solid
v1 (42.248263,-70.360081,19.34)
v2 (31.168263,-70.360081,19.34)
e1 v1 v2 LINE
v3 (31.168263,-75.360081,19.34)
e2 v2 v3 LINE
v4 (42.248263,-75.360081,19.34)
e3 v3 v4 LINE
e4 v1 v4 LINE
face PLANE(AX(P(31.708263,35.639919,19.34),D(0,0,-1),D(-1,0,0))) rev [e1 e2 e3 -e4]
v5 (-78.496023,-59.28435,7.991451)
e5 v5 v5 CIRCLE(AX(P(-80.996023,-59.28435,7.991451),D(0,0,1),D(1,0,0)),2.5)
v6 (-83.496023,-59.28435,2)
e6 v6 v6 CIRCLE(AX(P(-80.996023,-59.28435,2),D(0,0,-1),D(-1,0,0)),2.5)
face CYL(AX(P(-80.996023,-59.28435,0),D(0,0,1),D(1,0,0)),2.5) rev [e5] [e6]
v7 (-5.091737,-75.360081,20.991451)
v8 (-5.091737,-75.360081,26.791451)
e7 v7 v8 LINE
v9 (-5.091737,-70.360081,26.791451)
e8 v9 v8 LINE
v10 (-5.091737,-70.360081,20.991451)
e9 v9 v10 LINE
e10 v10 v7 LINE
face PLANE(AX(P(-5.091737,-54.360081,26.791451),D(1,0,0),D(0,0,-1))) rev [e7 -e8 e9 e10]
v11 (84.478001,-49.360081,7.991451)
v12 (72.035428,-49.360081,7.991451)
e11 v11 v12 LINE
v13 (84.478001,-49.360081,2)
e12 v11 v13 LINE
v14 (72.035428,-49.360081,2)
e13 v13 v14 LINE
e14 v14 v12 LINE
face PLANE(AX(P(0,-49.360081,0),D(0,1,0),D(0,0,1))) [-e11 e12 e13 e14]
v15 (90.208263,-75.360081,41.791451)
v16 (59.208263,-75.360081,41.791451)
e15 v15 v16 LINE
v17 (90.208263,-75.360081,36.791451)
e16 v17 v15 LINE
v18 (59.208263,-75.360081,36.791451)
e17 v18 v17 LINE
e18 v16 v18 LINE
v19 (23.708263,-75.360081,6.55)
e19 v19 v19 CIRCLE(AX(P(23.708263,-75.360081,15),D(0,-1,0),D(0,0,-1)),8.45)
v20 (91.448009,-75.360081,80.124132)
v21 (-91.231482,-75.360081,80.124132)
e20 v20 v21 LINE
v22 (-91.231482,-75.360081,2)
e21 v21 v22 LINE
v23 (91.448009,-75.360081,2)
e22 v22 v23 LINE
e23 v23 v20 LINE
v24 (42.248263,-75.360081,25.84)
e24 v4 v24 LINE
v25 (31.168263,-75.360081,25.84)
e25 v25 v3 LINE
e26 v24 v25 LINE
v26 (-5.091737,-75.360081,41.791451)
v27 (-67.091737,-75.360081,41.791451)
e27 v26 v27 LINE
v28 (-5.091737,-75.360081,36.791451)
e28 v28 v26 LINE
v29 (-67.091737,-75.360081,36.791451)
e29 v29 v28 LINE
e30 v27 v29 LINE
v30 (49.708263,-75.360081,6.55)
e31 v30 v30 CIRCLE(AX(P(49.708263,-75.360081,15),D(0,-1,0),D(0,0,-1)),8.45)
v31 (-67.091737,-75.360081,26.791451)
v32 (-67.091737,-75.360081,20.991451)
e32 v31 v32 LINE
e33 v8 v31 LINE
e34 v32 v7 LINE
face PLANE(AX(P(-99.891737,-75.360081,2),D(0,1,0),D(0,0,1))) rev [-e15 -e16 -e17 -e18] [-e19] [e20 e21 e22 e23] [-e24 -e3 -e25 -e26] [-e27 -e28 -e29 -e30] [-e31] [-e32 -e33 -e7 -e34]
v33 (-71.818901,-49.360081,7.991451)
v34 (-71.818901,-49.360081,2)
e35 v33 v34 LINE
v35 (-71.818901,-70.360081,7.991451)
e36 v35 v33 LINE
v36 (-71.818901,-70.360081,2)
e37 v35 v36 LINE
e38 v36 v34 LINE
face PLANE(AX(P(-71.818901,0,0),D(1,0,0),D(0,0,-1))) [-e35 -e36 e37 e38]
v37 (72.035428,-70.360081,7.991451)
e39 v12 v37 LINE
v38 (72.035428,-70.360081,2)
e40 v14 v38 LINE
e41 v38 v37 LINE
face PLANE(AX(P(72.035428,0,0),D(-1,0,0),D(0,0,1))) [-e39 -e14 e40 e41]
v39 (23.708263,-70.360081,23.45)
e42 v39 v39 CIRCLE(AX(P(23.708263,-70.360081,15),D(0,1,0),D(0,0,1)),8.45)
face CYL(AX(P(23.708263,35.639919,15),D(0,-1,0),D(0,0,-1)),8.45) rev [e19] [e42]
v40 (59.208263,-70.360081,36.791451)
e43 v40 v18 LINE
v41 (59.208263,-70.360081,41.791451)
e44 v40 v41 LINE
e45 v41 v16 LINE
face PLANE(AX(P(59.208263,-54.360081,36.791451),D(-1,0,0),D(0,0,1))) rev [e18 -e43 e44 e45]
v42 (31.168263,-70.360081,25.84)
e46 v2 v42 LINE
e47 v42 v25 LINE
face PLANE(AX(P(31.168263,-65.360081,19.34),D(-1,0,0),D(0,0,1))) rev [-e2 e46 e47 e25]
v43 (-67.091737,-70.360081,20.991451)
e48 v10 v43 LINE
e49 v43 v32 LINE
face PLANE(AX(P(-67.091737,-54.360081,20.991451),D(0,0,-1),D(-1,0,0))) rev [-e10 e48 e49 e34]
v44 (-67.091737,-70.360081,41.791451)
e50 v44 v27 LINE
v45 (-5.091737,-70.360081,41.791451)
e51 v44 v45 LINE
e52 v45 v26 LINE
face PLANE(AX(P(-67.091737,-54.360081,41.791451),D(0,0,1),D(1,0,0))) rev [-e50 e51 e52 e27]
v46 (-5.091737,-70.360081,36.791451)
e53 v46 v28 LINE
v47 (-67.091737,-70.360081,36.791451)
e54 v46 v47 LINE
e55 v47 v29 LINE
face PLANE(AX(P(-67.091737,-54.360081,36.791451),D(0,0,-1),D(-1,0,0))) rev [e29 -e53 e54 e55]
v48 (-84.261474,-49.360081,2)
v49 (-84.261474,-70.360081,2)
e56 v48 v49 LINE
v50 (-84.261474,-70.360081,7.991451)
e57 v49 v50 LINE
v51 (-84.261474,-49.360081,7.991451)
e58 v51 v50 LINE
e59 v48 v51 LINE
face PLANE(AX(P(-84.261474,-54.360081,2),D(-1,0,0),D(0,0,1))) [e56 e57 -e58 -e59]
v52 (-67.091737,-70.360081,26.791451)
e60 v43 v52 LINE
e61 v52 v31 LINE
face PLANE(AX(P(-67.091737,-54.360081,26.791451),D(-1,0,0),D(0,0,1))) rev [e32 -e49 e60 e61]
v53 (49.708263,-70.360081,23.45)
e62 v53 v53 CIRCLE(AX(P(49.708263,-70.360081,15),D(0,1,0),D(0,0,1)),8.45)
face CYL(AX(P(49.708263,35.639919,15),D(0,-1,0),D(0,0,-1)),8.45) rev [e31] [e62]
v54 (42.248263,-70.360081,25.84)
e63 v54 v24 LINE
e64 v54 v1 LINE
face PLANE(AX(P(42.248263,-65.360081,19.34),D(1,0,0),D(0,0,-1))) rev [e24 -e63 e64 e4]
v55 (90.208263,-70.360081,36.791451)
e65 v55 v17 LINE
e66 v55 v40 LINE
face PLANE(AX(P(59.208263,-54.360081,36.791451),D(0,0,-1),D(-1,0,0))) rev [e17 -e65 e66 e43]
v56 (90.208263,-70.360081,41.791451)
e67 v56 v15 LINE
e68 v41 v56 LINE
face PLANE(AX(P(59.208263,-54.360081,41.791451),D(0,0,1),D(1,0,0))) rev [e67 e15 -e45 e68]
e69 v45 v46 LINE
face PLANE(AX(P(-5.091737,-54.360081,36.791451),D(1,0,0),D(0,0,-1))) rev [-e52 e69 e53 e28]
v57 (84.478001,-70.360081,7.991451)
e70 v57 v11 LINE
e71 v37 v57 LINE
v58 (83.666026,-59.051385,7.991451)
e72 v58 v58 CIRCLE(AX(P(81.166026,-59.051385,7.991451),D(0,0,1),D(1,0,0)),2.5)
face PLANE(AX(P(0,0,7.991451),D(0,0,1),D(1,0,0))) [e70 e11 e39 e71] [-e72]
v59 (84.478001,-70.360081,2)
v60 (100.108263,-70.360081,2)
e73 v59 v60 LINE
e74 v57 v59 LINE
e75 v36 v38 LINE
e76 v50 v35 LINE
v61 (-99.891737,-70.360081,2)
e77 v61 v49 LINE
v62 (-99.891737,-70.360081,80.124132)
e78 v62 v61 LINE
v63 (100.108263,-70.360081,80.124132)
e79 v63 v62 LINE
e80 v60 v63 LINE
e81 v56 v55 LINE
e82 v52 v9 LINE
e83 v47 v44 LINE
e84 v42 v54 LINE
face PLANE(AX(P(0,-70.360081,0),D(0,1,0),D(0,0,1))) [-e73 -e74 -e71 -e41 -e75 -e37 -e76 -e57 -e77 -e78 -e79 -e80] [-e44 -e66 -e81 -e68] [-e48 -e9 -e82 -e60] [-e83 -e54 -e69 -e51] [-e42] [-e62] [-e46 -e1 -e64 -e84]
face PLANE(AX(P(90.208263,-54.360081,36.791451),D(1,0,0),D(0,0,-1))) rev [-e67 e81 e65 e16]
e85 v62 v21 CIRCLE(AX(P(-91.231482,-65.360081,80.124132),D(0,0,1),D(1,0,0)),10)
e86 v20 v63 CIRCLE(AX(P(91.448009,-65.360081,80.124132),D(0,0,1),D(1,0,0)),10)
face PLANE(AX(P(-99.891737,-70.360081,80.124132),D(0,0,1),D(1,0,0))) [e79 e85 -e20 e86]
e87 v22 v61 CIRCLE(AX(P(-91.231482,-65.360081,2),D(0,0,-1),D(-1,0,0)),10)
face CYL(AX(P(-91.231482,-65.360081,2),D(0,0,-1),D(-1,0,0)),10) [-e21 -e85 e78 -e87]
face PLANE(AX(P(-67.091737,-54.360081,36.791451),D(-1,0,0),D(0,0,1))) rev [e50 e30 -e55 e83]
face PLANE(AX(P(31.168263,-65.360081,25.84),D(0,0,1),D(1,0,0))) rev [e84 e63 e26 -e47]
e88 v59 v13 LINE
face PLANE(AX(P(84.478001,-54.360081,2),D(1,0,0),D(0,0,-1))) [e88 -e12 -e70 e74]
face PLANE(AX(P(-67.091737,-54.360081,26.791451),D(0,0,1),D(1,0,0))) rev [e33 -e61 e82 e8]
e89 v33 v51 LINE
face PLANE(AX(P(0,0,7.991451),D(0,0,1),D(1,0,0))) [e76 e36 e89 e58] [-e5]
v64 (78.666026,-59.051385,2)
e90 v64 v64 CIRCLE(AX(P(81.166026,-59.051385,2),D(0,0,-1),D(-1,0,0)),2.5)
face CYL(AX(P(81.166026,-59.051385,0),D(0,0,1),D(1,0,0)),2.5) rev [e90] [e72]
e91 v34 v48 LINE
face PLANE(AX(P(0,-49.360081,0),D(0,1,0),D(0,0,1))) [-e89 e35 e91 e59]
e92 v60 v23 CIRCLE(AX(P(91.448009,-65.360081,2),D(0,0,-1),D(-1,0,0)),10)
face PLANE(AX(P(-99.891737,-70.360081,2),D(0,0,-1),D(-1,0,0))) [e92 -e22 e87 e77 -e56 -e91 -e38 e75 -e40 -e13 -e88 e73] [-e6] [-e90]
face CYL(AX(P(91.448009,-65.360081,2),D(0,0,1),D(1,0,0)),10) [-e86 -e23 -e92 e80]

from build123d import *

# Parameters (mm, degrees)
CROQUIS2_W              = 200
CROQUIS2_H              = 150
CROQUIS2_R              = 2
CROQUIS2_R_2            = 2.5
CROQUIS2_W_2            = 31.297292299
CROQUIS2_H_2            = 43.768728426
CROQUIS2_H_3            = 43.768728427
CROQUIS2_W_3            = 23.573907934
CROQUIS2_H_4            = 45.323962431
SALIENTE_EXTRUIR1_DEPTH = 2
REDONDEO1_R             = 10
BOSS_EXTRUDE1_DEPTH     = 25
SKETCH3_W               = 62.040442094
SKETCH3_H               = 5.530821024
BOSS_EXTRUDE2_DEPTH     = 22
SKETCH8_W               = 62.040442094
SKETCH8_H               = 5.530821024
BOSS_EXTRUDE6_DEPTH     = 13
SKETCH2_W               = 200
SKETCH2_H               = 78.124132015
SKETCH2_W_2             = 62.040442094
SKETCH2_H_2             = 5.530821024
BOSS_EXTRUDE3_DEPTH     = 5
SKETCH4_W               = 62.040442094
SKETCH4_H               = 5.530821024
BOSS_EXTRUDE4_DEPTH     = 19
SKETCH5_W               = 7.442573222
SKETCH5_H               = 2.991451355
BOSS_EXTRUDE5_DEPTH     = 21
SKETCH6_R               = 2.5
CUT_EXTRUDE1_DEPTH      = 151.539762497
FILLET1_R               = 10
CUT_EXTRUDE2_DEPTH      = 153.054859813
CUT_EXTRUDE2_DEPTH_BACK = 13
SKETCH9_R               = 2.463920505
SKETCH9_R_2             = 2.5
SKETCH9_W               = 62.040442094
SKETCH9_H               = 4.214652984
CUT_EXTRUDE3_DEPTH      = 26
CUT_EXTRUDE3_DEPTH_BACK = 215.68865463
SKETCH10_W              = 2
SKETCH10_H              = 21
SKETCH11_W              = 62
SKETCH11_H              = 5.8
SKETCH11_H_2            = 5
SKETCH11_W_2            = 31
CUT_EXTRUDE4_DEPTH      = 130.932832439
CROQUIS4_W              = 2.991451355
CROQUIS4_H              = 16
SALIENTE_EXTRUIR2_DEPTH = 5
CROQUIS5_W              = 12.442573222
CROQUIS5_H              = 2.991451355
SALIENTE_EXTRUIR3_DEPTH = 5
CROQUIS7_W              = 12.442573222
CROQUIS7_H              = 21
SALIENTE_EXTRUIR4_DEPTH = 3
CORTAR_EXTRUIR3_START   = -15
CROQUIS8_R              = 2.5
CORTAR_EXTRUIR3_DEPTH   = 15
CROQUIS9_W              = 2.991451355
CROQUIS9_H              = 16
SALIENTE_EXTRUIR5_DEPTH = 5
CROQUIS10_W             = 12.442573222
CROQUIS10_H             = 2.991451355
SALIENTE_EXTRUIR6_DEPTH = 5
CROQUIS11_W             = 12.442573222
CROQUIS11_H             = 21
SALIENTE_EXTRUIR7_DEPTH = 3
CORTAR_EXTRUIR4_START   = -11
CROQUIS12_R             = 2.5
CORTAR_EXTRUIR4_DEPTH   = 11
CROQUIS15_R             = 8.45
CROQUIS15_W             = 10
CROQUIS15_H             = 5
CORTAR_EXTRUIR8_DEPTH   = 111
CORTAR_EXTRUIR10_DEPTH  = 10


with BuildPart() as part:
    # Croquis2 → Saliente-Extruir1 (new body)
    with BuildSketch(Plane.XY):
        with Locations((0.108263467, -0.36008145)):
            Rectangle(CROQUIS2_W, CROQUIS2_H)
        with Locations((89.108263467, -66.5)):
            Circle(CROQUIS2_R, mode=Mode.SUBTRACT)
        with Locations((-88.891736533, -66.5)):
            Circle(CROQUIS2_R, mode=Mode.SUBTRACT)
        with Locations(Location((89.108263467, 65.779837101, 0), (0, 0, 180))):
            Circle(CROQUIS2_R, mode=Mode.SUBTRACT)
        with Locations(Location((-88.891736533, 65.779837101, 0), (0, 0, 180))):
            Circle(CROQUIS2_R, mode=Mode.SUBTRACT)
        with Locations((-80.865436179, -59.36008145)):
            Circle(CROQUIS2_R_2, mode=Mode.SUBTRACT)
        with Locations((81.108263467, -59.36008145)):
            Circle(CROQUIS2_R_2, mode=Mode.SUBTRACT)
        with Locations(Location((81.108263467, 58.63991855, 0), (0, 0, 180))):
            Circle(CROQUIS2_R_2, mode=Mode.SUBTRACT)
        with Locations(Location((-80.865436179, 58.63991855, 0), (0, 0, 180))):
            Circle(CROQUIS2_R_2, mode=Mode.SUBTRACT)
        with BuildLine():
            Line((-62.091736533, 70.63991855), (64.108263467, 70.63991855))
            ThreePointArc((64.108263467, 70.63991855), (66.108263467, 68.63991855), (64.108263467, 66.63991855))
            Line((64.108263467, 66.63991855), (-62.091736533, 66.63991855))
            ThreePointArc((-62.091736533, 66.63991855), (-64.091736533, 68.63991855), (-62.091736533, 70.63991855))
        make_face(mode=Mode.SUBTRACT)
        Polygon((-71.391736533, -12.902447307), (-71.391736533, 12.182284408), (-79.241736533, 12.28991855), (-83.891736533, 12.28991855), (-83.891736533, -13.01008145), (-79.241736533, -13.01008145), align=None, mode=Mode.SUBTRACT)
        with BuildLine():
            Line((92.108263467, 45.478381757), (92.108263467, -46.198544657))
            ThreePointArc((92.108263467, -46.198544657), (90.807295546, -47.897576736), (89.108263467, -46.596608814))
            Line((89.108263467, -46.596608814), (89.108263467, 45.876445915))
            ThreePointArc((89.108263467, 45.876445915), (90.807295546, 47.177413836), (92.108263467, 45.478381757))
        make_face(mode=Mode.SUBTRACT)
        Polygon((84.108263467, 12.28991855), (84.108263467, -13.01008145), (79.458263467, -13.01008145), (71.608263467, -13.01008145), (71.608263467, 12.28991855), (79.458263467, 12.28991855), align=None, mode=Mode.SUBTRACT)
        with BuildLine():
            Line((-91.891736533, 45.478381757), (-91.891736533, -46.198544657))
            ThreePointArc((-91.891736533, -46.198544657), (-90.590768612, -47.897576736), (-88.891736533, -46.596608814))
            Line((-88.891736533, -46.596608814), (-88.891736533, 45.876445915))
            ThreePointArc((-88.891736533, 45.876445915), (-90.590768612, 47.177413836), (-91.891736533, 45.478381757))
        make_face(mode=Mode.SUBTRACT)
        with Locations((-30.011405388, 36.299005811)):
            Rectangle(CROQUIS2_W_2, CROQUIS2_H_2, mode=Mode.SUBTRACT)
        with BuildLine():
            Line((-62.091736533, -71.36008145), (64.108263467, -71.36008145))
            ThreePointArc((64.108263467, -71.36008145), (66.108263467, -69.36008145), (64.108263467, -67.36008145))
            Line((64.108263467, -67.36008145), (-62.091736533, -67.36008145))
            ThreePointArc((-62.091736533, -67.36008145), (-64.091736533, -69.36008145), (-62.091736533, -71.36008145))
        make_face(mode=Mode.SUBTRACT)
        with Locations((-30.011405388, -26.799059535)):
            Rectangle(CROQUIS2_W_2, CROQUIS2_H_3, mode=Mode.SUBTRACT)
        with Locations((12.982877294, -0.693345879)):
            Rectangle(CROQUIS2_W_3, CROQUIS2_H_4, mode=Mode.SUBTRACT)
    extrude(amount=SALIENTE_EXTRUIR1_DEPTH)

    # Redondeo1
    redondeo1_edges = [part.edges().sort_by_distance(p)[0] for p in [
        (100.108263467, -75.36008145, 1),
        (-99.891736533, -75.36008145, 1),
        (-99.891736533, 74.63991855, 1),
        (100.108263467, 74.63991855, 1),
    ]]
    fillet(redondeo1_edges, radius=REDONDEO1_R)

    # Sketch1 → Boss-Extrude1 (add)
    with BuildSketch(Plane.XY.offset(2)):
        Polygon((-67.071845217, 64.63991855), (-67.071845217, 60.63991855), (-8.841198185, 60.63991855), (-8.841198185, 3.63991855), (-67.071845217, 3.63991855), (-67.071845217, -0.36008145), (-8.841198185, -0.36008145), (-8.841198185, -53.36008145), (-67.071845217, -53.36008145), (-67.071845217, -57.574734434), (-5.031403123, -57.574734434), (-5.031403123, -40.931443482), (46.608263467, -40.931443482), (46.608263467, -36.931443482), (-5.031403123, -36.931443482), (-5.031403123, 30.068556518), (46.608263467, 30.068556518), (46.608263467, 34.068556518), (-5.031403123, 34.068556518), (-5.031403123, 64.63991855), align=None)
    extrude(amount=BOSS_EXTRUDE1_DEPTH)

    # Sketch3 → Boss-Extrude2 (add)
    with BuildSketch(Plane.XZ.offset(57.574734434)):
        with Locations((-36.05162417, 24.234589488)):
            Rectangle(SKETCH3_W, SKETCH3_H)
    extrude(amount=BOSS_EXTRUDE2_DEPTH)

    # Sketch8 → Boss-Extrude6 (add)
    with BuildSketch(Plane(origin=(0, 64.63991855, 0), x_dir=(1, 0, 0), z_dir=(0, 1, 0))):
        with Locations((-36.05162417, -24.234589488)):
            Rectangle(SKETCH8_W, SKETCH8_H)
    extrude(amount=BOSS_EXTRUDE6_DEPTH)

    # Sketch2 → Boss-Extrude3 (add)
    with BuildSketch(Plane.XZ.offset(75.36008145)):
        with Locations((0.108263467, 41.062066008)):
            Rectangle(SKETCH2_W, SKETCH2_H)
        with Locations((-36.05162417, 24.234589488)):
            Rectangle(SKETCH2_W_2, SKETCH2_H_2, mode=Mode.SUBTRACT)
    extrude(amount=-BOSS_EXTRUDE3_DEPTH)

    # Sketch4 → Boss-Extrude4 (add)
    with BuildSketch(Plane(origin=(0, 64.63991855, 0), x_dir=(1, 0, 0), z_dir=(0, 1, 0))):
        with Locations((-36.05162417, -24.234589488)):
            Rectangle(SKETCH4_W, SKETCH4_H)
    extrude(amount=BOSS_EXTRUDE4_DEPTH)

    # Sketch5 → Boss-Extrude5 (add)
    with BuildSketch(Plane.XZ.offset(75.36008145)):
        with Locations((-80.540187187, 3.495725678)):
            Rectangle(SKETCH5_W, SKETCH5_H)
        with Locations((80.756714122, 3.495725678)):
            Rectangle(SKETCH5_W, SKETCH5_H)
    extrude(amount=-BOSS_EXTRUDE5_DEPTH)

    # Sketch6 → Cut-Extrude1 (cut, through all)
    with BuildSketch(Plane.XY.offset(4.991451355)):
        with Locations((-80.996023003, -59.284349751)):
            Circle(SKETCH6_R)
        with Locations(Location((81.166025964, -59.051385225, 0), (0, 0, 345.800348631))):
            Circle(SKETCH6_R)
    extrude(amount=-CUT_EXTRUDE1_DEPTH, mode=Mode.SUBTRACT)

    # Fillet1
    # the kernel refuses this fillet: 10 mm, written as the material it takes off along each edge
    with BuildSketch(Plane(origin=(-99.891736533, -75.36008145, 101.77476711), x_dir=(1, 0, 0), z_dir=(0, 0, -1)), Plane(origin=(100.108263467, -75.36008145, -19.650635095), x_dir=(-1, 0, 0), z_dir=(0, 0, 1))) as fillet1_piece_1:
        with BuildLine():
            CenterArc((8.660254038, -10), FILLET1_R, 90, 60)
            Line((0, -5), (-0.173205081, -4.9))
            ThreePointArc((-0.173205081, -4.9), (-0.2, -2.5), (-0.2, 0))
            Line((-0.2, 0), (0, 0.2))
            Line((0, 0.2), (8.660254038, 0.2))
            Line((8.660254038, 0.2), (8.660254038, 0))
        make_face()
    extrude(amount=121.425402204, mode=Mode.SUBTRACT)

    # Sketch9 → Cut-Extrude2 (cut, two sides: drawn at the far end of the back side and taken through both)
    with BuildSketch(Plane.XY.offset(2).offset(-CUT_EXTRUDE2_DEPTH_BACK)):
        with Locations((-80.996023003, -59.284349751)):
            Circle(SKETCH9_R)
        with Locations(Location((81.166025964, -59.051385225, 0), (0, 0, 345.800348631))):
            Circle(SKETCH9_R_2)
        Polygon((-84.261473798, -70.36008145), (-84.261473798, -54.36008145), (-76.818900576, -54.36008145), (-76.818900576, -70.36008145), (77.035427511, -70.36008145), (77.035427511, -54.36008145), (84.478000733, -54.36008145), (84.478000733, -70.36008145), (100.108263467, -70.36008145), (100.108263467, 85.68147533), (-108.295057911, 85.68147533), (-108.295057911, -70.36008145), align=None)
        with Locations((-36.05162417, -77.467407942)):
            Rectangle(SKETCH9_W, SKETCH9_H)
    extrude(amount=CUT_EXTRUDE2_DEPTH + CUT_EXTRUDE2_DEPTH_BACK, mode=Mode.SUBTRACT)

    # Sketch10 → Cut-Extrude3 (cut, two sides: drawn at the far end of the back side and taken through both)
    with BuildSketch(Plane.ZY.offset(84.261473798).offset(-CUT_EXTRUDE3_DEPTH_BACK)):
        with Locations((1, -64.86008145)):
            Rectangle(SKETCH10_W, SKETCH10_H)
    extrude(amount=CUT_EXTRUDE3_DEPTH + CUT_EXTRUDE3_DEPTH_BACK, mode=Mode.SUBTRACT)

    # Sketch11 → Cut-Extrude4 (cut, through all)
    with BuildSketch(Plane.XZ.offset(75.36008145)):
        with Locations((-36.091736533, 23.891451355)):
            Rectangle(SKETCH11_W, SKETCH11_H)
        with Locations((-36.091736533, 39.291451355)):
            Rectangle(SKETCH11_W, SKETCH11_H_2)
        with Locations((74.708263467, 39.291451355)):
            Rectangle(SKETCH11_W_2, SKETCH11_H_2)
    extrude(amount=-CUT_EXTRUDE4_DEPTH, mode=Mode.SUBTRACT)

    # Croquis4 → Saliente-Extruir2 (add)
    with BuildSketch(Plane.ZY.offset(-77.035427511)):
        with Locations((3.495725678, -62.36008145)):
            Rectangle(CROQUIS4_W, CROQUIS4_H)
    extrude(amount=SALIENTE_EXTRUIR2_DEPTH)

    # Croquis5 → Saliente-Extruir3 (add)
    with BuildSketch(Plane(origin=(0, -54.36008145, 0), x_dir=(1, 0, 0), z_dir=(0, 1, 0))):
        with Locations((78.256714122, -3.495725678)):
            Rectangle(CROQUIS5_W, CROQUIS5_H)
    extrude(amount=SALIENTE_EXTRUIR3_DEPTH)

    # Croquis7 → Saliente-Extruir4 (add)
    with BuildSketch(Plane.XY.offset(4.991451355)):
        with Locations((78.256714122, -59.86008145)):
            Rectangle(CROQUIS7_W, CROQUIS7_H)
    extrude(amount=SALIENTE_EXTRUIR4_DEPTH)

    # Croquis8 → Cortar-Extruir3 (cut)
    with BuildSketch(Plane(origin=(0, 0, 2), x_dir=(-1, 0, 0), z_dir=(0, 0, -1)).offset(CORTAR_EXTRUIR3_START)):
        with Locations(Location((-81.166025964, -59.051385225, 0), (0, 0, 180))):
            Circle(CROQUIS8_R)
    extrude(amount=CORTAR_EXTRUIR3_DEPTH, mode=Mode.SUBTRACT)

    # Croquis9 → Saliente-Extruir5 (add)
    with BuildSketch(Plane(origin=(-76.818900576, 0, 0), x_dir=(0, 0, -1), z_dir=(1, 0, 0))):
        with Locations((-3.495725678, -62.36008145)):
            Rectangle(CROQUIS9_W, CROQUIS9_H)
    extrude(amount=SALIENTE_EXTRUIR5_DEPTH)

    # Croquis10 → Saliente-Extruir6 (add)
    with BuildSketch(Plane(origin=(0, -54.36008145, 0), x_dir=(1, 0, 0), z_dir=(0, 1, 0))):
        with Locations((-78.040187187, -3.495725678)):
            Rectangle(CROQUIS10_W, CROQUIS10_H)
    extrude(amount=SALIENTE_EXTRUIR6_DEPTH)

    # Croquis11 → Saliente-Extruir7 (add)
    with BuildSketch(Plane.XY.offset(4.991451355)):
        with Locations((-78.040187187, -59.86008145)):
            Rectangle(CROQUIS11_W, CROQUIS11_H)
    extrude(amount=SALIENTE_EXTRUIR7_DEPTH)

    # Croquis12 → Cortar-Extruir4 (cut)
    with BuildSketch(Plane(origin=(0, 0, 2), x_dir=(-1, 0, 0), z_dir=(0, 0, -1)).offset(CORTAR_EXTRUIR4_START)):
        with Locations(Location((80.996023003, -59.284349751, 0), (0, 0, 180))):
            Circle(CROQUIS12_R)
    extrude(amount=CORTAR_EXTRUIR4_DEPTH, mode=Mode.SUBTRACT)

    # Croquis15 → Cortar-Extruir8 (cut)
    with BuildSketch(Plane.XZ.offset(75.36008145)):
        with Locations(Location((23.708263467, 15, 0), (0, 0, 270))):
            Circle(CROQUIS15_R)
        with Locations(Location((49.708263467, 15, 0), (0, 0, 270))):
            Circle(CROQUIS15_R)
        with Locations((36.708263467, 21.84)):
            Rectangle(CROQUIS15_W, CROQUIS15_H)
    extrude(amount=-CORTAR_EXTRUIR8_DEPTH, mode=Mode.SUBTRACT)

    # Croquis16 → Cortar-Extruir10 (cut)
    with BuildSketch(Plane.XZ.offset(75.36008145)):
        Polygon((31.708263467, 25.84), (41.708263467, 25.84), (42.248263467, 25.84), (42.248263467, 19.34), (41.708263467, 19.34), (41.708263467, 24.34), (31.708263467, 24.34), (31.708263467, 19.34), (31.168263467, 19.34), (31.168263467, 25.84), align=None)
    extrude(amount=-CORTAR_EXTRUIR10_DEPTH, mode=Mode.SUBTRACT)


solid = part.part
